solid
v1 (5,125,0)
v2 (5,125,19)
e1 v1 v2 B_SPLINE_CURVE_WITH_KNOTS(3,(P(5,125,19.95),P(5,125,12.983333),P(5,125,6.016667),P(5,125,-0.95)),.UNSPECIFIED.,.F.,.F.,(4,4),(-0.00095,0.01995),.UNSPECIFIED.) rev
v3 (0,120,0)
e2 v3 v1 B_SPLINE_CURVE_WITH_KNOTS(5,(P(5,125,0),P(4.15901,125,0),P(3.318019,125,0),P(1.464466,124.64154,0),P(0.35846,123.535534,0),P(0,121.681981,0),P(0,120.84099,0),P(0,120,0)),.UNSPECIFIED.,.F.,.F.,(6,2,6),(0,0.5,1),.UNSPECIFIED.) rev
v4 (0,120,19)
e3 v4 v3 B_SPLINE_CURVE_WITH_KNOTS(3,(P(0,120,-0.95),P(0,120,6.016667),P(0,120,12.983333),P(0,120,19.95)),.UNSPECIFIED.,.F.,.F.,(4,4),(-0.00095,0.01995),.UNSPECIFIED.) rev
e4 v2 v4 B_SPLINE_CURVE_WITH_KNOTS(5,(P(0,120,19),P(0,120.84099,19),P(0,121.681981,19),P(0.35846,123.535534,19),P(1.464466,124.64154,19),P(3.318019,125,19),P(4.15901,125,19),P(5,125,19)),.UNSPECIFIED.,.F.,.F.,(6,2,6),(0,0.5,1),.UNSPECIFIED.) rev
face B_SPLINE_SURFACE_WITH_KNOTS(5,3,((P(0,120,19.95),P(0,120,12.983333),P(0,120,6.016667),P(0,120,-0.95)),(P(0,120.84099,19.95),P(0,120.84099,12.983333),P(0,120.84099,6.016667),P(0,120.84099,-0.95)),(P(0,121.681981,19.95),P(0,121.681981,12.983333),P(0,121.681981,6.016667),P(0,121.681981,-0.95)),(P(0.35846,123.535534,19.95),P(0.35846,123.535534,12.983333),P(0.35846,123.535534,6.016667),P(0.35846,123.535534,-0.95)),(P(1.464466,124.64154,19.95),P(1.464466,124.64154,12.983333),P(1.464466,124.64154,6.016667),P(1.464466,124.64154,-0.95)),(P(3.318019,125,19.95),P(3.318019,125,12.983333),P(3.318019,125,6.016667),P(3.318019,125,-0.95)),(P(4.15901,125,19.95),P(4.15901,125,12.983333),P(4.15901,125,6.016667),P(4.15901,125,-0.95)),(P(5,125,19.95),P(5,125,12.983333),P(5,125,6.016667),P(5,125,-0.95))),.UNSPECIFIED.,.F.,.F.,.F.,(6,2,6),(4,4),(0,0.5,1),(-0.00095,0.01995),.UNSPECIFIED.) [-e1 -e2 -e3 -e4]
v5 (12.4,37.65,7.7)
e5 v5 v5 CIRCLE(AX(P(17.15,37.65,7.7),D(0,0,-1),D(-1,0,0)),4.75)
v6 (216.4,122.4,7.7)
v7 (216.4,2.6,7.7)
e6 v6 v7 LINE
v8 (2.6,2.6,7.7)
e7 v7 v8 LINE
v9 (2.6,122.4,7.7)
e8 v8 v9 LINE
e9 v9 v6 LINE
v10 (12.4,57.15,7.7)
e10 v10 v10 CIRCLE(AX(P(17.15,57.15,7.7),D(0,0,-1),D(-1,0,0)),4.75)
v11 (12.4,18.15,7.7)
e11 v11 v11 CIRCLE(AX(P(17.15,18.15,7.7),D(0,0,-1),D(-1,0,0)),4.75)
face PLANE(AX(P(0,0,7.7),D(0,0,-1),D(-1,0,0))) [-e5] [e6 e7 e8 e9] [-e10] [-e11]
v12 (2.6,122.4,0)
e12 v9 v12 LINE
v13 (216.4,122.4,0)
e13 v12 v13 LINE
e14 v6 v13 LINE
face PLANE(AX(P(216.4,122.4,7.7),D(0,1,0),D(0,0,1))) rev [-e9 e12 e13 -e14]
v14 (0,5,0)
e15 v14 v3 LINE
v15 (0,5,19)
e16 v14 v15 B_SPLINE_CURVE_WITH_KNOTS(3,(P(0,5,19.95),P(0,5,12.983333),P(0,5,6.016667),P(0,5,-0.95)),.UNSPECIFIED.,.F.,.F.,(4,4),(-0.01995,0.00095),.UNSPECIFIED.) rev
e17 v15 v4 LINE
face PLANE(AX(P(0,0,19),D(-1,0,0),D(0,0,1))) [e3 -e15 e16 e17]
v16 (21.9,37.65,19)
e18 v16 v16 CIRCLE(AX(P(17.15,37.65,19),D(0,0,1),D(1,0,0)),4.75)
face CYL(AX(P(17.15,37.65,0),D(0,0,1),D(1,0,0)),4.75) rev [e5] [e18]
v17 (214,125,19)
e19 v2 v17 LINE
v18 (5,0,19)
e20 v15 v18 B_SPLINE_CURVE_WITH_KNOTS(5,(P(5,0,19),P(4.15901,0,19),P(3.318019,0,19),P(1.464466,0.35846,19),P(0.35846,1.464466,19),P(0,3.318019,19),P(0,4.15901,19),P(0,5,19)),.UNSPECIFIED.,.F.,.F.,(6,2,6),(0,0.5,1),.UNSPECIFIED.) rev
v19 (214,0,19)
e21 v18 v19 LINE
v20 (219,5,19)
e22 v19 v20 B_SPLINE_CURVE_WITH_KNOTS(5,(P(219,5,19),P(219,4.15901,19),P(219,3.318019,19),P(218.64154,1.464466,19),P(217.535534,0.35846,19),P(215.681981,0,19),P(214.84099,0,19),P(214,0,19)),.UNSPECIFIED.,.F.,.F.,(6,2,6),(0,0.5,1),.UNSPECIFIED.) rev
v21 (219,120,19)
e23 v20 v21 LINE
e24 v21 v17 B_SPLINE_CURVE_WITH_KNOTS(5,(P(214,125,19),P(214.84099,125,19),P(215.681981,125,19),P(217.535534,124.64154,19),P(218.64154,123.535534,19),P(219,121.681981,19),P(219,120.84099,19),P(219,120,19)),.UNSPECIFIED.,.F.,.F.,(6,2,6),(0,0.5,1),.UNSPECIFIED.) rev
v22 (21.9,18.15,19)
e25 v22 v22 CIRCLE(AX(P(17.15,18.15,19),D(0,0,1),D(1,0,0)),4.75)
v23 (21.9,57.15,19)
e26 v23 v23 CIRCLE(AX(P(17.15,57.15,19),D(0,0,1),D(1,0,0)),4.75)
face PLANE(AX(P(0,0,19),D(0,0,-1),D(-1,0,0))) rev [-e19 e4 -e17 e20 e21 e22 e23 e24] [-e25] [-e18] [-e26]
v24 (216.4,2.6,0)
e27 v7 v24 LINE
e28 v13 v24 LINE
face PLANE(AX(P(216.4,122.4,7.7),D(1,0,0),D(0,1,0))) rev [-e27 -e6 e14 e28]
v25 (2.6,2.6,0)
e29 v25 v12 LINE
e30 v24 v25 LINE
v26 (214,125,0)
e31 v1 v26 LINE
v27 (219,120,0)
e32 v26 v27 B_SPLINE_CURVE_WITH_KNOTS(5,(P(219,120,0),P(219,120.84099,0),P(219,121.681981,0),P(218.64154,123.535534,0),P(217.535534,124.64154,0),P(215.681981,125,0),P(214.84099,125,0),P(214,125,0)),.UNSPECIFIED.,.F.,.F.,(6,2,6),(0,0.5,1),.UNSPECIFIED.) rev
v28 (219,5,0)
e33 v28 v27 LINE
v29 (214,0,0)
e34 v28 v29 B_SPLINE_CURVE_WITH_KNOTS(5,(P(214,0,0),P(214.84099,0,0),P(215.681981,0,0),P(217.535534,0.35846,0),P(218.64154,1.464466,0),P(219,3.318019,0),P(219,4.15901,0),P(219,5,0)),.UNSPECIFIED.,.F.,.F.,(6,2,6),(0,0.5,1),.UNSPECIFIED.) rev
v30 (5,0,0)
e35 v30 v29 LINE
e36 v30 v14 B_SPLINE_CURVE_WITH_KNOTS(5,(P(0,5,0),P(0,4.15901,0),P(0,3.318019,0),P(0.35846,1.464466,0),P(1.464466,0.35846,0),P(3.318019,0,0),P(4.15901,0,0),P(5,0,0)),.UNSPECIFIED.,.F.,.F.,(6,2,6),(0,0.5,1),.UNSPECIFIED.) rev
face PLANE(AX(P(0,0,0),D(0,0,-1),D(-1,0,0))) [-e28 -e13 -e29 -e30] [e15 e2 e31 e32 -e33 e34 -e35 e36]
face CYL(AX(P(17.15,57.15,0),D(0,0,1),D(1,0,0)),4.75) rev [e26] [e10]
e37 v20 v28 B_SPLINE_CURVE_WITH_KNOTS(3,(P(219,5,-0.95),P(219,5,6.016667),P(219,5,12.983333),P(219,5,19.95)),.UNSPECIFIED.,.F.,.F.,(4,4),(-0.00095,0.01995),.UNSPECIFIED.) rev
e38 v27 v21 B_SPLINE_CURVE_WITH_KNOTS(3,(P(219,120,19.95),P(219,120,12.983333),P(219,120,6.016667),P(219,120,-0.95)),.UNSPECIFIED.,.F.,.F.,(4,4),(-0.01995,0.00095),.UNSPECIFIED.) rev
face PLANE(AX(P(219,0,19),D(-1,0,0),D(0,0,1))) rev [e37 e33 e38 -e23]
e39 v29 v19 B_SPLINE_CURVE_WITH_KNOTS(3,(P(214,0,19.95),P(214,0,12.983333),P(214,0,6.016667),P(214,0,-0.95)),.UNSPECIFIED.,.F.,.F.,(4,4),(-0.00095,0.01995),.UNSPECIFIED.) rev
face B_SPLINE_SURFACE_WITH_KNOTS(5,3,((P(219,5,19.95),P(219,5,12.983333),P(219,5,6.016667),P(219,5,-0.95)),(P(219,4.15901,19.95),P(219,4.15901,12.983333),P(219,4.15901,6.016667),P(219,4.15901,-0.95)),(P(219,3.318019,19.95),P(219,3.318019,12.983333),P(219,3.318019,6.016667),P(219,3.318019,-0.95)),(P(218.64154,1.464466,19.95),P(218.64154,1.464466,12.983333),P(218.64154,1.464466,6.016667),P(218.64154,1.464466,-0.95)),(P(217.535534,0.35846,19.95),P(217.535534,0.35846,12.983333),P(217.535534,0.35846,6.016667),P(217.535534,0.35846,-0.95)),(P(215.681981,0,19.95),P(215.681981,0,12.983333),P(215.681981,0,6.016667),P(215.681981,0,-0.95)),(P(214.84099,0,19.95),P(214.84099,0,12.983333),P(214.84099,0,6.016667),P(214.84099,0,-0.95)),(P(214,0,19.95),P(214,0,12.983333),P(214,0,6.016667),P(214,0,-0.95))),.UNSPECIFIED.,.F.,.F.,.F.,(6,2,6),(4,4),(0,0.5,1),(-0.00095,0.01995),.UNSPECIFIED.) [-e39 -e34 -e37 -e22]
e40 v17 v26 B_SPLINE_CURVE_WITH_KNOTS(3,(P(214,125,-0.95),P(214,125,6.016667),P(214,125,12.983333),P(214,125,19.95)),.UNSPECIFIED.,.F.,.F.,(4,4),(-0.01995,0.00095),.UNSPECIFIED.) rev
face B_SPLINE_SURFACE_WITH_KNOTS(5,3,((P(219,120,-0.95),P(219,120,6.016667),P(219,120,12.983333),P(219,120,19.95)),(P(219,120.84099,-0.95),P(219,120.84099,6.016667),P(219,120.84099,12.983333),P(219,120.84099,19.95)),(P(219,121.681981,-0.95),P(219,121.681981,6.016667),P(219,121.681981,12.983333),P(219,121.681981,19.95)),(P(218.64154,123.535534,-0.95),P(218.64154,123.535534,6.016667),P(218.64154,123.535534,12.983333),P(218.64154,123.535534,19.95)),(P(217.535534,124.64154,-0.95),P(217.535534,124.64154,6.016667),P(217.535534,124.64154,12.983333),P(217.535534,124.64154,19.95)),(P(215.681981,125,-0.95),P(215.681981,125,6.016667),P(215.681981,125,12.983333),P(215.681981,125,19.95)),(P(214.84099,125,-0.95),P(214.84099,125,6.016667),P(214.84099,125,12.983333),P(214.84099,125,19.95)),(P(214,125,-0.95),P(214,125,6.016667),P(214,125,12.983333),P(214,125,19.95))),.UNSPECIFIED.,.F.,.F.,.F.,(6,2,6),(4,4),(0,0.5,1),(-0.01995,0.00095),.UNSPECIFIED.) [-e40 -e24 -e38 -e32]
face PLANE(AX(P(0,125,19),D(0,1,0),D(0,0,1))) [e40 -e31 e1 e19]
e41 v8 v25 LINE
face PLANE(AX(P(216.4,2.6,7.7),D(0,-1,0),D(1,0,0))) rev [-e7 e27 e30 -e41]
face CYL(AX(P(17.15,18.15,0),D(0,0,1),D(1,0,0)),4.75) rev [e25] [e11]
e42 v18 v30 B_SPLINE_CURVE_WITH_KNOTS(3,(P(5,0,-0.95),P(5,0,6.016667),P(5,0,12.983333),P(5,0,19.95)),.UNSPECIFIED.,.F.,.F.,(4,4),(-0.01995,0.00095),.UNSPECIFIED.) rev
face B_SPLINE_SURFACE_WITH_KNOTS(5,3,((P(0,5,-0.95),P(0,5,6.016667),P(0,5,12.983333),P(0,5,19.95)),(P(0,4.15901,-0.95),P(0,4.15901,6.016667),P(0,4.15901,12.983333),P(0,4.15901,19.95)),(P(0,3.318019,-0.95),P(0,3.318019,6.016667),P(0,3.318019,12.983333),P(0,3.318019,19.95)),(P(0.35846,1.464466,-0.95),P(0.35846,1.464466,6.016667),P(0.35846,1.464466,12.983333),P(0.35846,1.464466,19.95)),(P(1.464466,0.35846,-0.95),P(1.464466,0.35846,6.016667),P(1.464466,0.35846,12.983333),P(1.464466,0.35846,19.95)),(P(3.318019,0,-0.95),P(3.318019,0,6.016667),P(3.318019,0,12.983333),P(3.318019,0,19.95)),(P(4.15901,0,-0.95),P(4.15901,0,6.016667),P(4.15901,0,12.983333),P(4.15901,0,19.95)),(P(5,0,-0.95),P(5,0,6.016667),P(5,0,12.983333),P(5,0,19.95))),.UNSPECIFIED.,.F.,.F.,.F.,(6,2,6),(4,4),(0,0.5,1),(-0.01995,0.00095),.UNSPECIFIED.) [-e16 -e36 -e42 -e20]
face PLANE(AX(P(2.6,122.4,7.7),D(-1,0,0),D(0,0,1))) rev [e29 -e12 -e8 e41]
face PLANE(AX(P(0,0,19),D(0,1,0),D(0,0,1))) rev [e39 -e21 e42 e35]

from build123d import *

# Parameters (mm, degrees)
ESQUISSE1_W             = 219
ESQUISSE1_H             = 125
BOSS_EXTRU_1_DEPTH      = 19
ESQUISSE3_W             = 213.8
ESQUISSE3_H             = 119.8
ENL_V_MAT_EXTRU_1_DEPTH = 7.7
ESQUISSE4_R             = 4.75
ENL_V_MAT_EXTRU_2_DEPTH = 253.87744067
CONG_4_SIZE             = 5
CONG_5_SIZE             = 5


with BuildPart() as part:
    # Esquisse1 → Boss.-Extru.1 (new body)
    with BuildSketch(Plane.XY):
        with Locations((109.5, 62.5)):
            Rectangle(ESQUISSE1_W, ESQUISSE1_H)
    extrude(amount=BOSS_EXTRU_1_DEPTH)

    # Esquisse3 → Enlèv. mat.-Extru.1 (cut)
    with BuildSketch(Plane(origin=(0, 0, 0), x_dir=(-1, 0, 0), z_dir=(0, 0, -1))):
        with Locations((-109.5, 62.5)):
            Rectangle(ESQUISSE3_W, ESQUISSE3_H)
    extrude(amount=-ENL_V_MAT_EXTRU_1_DEPTH, mode=Mode.SUBTRACT)

    # Esquisse4 → Enlèv. mat.-Extru.2 (cut, through all)
    with BuildSketch(Plane.XY.offset(19)):
        with Locations((17.15, 57.15)):
            Circle(ESQUISSE4_R)
        with Locations((17.15, 37.65)):
            Circle(ESQUISSE4_R)
        with Locations((17.15, 18.15)):
            Circle(ESQUISSE4_R)
    extrude(amount=-ENL_V_MAT_EXTRU_2_DEPTH, mode=Mode.SUBTRACT)

    # Congé4
    # a fillet whose section is not a circle: 5 mm, written as the material it takes off along each edge
    with BuildSketch(Plane(origin=(219, 0, -12.5), x_dir=(-1, 0, 0), z_dir=(0, 0, 1))) as cong_4_piece_1:
        with BuildLine():
            add(Edge.make_bspline([(CONG_4_SIZE, 0), (CONG_4_SIZE * 0.831801948466, 0), (CONG_4_SIZE * 0.663603896932, 0), (CONG_4_SIZE * 0.292893218813, -CONG_4_SIZE * 0.0716919198361), (CONG_4_SIZE * 0.0716919198361, -CONG_4_SIZE * 0.292893218813), (0, -CONG_4_SIZE * 0.663603896932), (0, -CONG_4_SIZE * 0.831801948466), (0, -CONG_4_SIZE)], knots=[0, 0, 0, 0, 0, 0, 0.5, 0.5, 1, 1, 1, 1, 1, 1], degree=5))
            Line((0, -CONG_4_SIZE), (0, 0))
            Line((0, 0), (CONG_4_SIZE, 0))
        make_face()
    extrude(amount=44, mode=Mode.SUBTRACT)

    # Congé5
    # a fillet whose section is not a circle: 5 mm, written as the material it takes off along each edge
    with BuildSketch(Plane(origin=(0, 125, -12.5), x_dir=(0, -1, 0), z_dir=(0, 0, 1)), Plane(origin=(0, 0, -12.5), x_dir=(1, 0, 0), z_dir=(0, 0, 1)), Plane(origin=(219, 125, -12.5), x_dir=(-1, 0, 0), z_dir=(0, 0, 1))) as cong_5_piece_1:
        with BuildLine():
            add(Edge.make_bspline([(CONG_5_SIZE, 0), (CONG_5_SIZE * 0.831801948466, 0), (CONG_5_SIZE * 0.663603896932, 0), (CONG_5_SIZE * 0.292893218813, CONG_5_SIZE * 0.0716919198361), (CONG_5_SIZE * 0.0716919198361, CONG_5_SIZE * 0.292893218813), (0, CONG_5_SIZE * 0.663603896932), (0, CONG_5_SIZE * 0.831801948466), (0, CONG_5_SIZE)], knots=[0, 0, 0, 0, 0, 0, 0.5, 0.5, 1, 1, 1, 1, 1, 1], degree=5))
            Line((0, CONG_5_SIZE), (0, 0))
            Line((0, 0), (CONG_5_SIZE, 0))
        make_face()
    extrude(amount=44, mode=Mode.SUBTRACT)


solid = part.part
